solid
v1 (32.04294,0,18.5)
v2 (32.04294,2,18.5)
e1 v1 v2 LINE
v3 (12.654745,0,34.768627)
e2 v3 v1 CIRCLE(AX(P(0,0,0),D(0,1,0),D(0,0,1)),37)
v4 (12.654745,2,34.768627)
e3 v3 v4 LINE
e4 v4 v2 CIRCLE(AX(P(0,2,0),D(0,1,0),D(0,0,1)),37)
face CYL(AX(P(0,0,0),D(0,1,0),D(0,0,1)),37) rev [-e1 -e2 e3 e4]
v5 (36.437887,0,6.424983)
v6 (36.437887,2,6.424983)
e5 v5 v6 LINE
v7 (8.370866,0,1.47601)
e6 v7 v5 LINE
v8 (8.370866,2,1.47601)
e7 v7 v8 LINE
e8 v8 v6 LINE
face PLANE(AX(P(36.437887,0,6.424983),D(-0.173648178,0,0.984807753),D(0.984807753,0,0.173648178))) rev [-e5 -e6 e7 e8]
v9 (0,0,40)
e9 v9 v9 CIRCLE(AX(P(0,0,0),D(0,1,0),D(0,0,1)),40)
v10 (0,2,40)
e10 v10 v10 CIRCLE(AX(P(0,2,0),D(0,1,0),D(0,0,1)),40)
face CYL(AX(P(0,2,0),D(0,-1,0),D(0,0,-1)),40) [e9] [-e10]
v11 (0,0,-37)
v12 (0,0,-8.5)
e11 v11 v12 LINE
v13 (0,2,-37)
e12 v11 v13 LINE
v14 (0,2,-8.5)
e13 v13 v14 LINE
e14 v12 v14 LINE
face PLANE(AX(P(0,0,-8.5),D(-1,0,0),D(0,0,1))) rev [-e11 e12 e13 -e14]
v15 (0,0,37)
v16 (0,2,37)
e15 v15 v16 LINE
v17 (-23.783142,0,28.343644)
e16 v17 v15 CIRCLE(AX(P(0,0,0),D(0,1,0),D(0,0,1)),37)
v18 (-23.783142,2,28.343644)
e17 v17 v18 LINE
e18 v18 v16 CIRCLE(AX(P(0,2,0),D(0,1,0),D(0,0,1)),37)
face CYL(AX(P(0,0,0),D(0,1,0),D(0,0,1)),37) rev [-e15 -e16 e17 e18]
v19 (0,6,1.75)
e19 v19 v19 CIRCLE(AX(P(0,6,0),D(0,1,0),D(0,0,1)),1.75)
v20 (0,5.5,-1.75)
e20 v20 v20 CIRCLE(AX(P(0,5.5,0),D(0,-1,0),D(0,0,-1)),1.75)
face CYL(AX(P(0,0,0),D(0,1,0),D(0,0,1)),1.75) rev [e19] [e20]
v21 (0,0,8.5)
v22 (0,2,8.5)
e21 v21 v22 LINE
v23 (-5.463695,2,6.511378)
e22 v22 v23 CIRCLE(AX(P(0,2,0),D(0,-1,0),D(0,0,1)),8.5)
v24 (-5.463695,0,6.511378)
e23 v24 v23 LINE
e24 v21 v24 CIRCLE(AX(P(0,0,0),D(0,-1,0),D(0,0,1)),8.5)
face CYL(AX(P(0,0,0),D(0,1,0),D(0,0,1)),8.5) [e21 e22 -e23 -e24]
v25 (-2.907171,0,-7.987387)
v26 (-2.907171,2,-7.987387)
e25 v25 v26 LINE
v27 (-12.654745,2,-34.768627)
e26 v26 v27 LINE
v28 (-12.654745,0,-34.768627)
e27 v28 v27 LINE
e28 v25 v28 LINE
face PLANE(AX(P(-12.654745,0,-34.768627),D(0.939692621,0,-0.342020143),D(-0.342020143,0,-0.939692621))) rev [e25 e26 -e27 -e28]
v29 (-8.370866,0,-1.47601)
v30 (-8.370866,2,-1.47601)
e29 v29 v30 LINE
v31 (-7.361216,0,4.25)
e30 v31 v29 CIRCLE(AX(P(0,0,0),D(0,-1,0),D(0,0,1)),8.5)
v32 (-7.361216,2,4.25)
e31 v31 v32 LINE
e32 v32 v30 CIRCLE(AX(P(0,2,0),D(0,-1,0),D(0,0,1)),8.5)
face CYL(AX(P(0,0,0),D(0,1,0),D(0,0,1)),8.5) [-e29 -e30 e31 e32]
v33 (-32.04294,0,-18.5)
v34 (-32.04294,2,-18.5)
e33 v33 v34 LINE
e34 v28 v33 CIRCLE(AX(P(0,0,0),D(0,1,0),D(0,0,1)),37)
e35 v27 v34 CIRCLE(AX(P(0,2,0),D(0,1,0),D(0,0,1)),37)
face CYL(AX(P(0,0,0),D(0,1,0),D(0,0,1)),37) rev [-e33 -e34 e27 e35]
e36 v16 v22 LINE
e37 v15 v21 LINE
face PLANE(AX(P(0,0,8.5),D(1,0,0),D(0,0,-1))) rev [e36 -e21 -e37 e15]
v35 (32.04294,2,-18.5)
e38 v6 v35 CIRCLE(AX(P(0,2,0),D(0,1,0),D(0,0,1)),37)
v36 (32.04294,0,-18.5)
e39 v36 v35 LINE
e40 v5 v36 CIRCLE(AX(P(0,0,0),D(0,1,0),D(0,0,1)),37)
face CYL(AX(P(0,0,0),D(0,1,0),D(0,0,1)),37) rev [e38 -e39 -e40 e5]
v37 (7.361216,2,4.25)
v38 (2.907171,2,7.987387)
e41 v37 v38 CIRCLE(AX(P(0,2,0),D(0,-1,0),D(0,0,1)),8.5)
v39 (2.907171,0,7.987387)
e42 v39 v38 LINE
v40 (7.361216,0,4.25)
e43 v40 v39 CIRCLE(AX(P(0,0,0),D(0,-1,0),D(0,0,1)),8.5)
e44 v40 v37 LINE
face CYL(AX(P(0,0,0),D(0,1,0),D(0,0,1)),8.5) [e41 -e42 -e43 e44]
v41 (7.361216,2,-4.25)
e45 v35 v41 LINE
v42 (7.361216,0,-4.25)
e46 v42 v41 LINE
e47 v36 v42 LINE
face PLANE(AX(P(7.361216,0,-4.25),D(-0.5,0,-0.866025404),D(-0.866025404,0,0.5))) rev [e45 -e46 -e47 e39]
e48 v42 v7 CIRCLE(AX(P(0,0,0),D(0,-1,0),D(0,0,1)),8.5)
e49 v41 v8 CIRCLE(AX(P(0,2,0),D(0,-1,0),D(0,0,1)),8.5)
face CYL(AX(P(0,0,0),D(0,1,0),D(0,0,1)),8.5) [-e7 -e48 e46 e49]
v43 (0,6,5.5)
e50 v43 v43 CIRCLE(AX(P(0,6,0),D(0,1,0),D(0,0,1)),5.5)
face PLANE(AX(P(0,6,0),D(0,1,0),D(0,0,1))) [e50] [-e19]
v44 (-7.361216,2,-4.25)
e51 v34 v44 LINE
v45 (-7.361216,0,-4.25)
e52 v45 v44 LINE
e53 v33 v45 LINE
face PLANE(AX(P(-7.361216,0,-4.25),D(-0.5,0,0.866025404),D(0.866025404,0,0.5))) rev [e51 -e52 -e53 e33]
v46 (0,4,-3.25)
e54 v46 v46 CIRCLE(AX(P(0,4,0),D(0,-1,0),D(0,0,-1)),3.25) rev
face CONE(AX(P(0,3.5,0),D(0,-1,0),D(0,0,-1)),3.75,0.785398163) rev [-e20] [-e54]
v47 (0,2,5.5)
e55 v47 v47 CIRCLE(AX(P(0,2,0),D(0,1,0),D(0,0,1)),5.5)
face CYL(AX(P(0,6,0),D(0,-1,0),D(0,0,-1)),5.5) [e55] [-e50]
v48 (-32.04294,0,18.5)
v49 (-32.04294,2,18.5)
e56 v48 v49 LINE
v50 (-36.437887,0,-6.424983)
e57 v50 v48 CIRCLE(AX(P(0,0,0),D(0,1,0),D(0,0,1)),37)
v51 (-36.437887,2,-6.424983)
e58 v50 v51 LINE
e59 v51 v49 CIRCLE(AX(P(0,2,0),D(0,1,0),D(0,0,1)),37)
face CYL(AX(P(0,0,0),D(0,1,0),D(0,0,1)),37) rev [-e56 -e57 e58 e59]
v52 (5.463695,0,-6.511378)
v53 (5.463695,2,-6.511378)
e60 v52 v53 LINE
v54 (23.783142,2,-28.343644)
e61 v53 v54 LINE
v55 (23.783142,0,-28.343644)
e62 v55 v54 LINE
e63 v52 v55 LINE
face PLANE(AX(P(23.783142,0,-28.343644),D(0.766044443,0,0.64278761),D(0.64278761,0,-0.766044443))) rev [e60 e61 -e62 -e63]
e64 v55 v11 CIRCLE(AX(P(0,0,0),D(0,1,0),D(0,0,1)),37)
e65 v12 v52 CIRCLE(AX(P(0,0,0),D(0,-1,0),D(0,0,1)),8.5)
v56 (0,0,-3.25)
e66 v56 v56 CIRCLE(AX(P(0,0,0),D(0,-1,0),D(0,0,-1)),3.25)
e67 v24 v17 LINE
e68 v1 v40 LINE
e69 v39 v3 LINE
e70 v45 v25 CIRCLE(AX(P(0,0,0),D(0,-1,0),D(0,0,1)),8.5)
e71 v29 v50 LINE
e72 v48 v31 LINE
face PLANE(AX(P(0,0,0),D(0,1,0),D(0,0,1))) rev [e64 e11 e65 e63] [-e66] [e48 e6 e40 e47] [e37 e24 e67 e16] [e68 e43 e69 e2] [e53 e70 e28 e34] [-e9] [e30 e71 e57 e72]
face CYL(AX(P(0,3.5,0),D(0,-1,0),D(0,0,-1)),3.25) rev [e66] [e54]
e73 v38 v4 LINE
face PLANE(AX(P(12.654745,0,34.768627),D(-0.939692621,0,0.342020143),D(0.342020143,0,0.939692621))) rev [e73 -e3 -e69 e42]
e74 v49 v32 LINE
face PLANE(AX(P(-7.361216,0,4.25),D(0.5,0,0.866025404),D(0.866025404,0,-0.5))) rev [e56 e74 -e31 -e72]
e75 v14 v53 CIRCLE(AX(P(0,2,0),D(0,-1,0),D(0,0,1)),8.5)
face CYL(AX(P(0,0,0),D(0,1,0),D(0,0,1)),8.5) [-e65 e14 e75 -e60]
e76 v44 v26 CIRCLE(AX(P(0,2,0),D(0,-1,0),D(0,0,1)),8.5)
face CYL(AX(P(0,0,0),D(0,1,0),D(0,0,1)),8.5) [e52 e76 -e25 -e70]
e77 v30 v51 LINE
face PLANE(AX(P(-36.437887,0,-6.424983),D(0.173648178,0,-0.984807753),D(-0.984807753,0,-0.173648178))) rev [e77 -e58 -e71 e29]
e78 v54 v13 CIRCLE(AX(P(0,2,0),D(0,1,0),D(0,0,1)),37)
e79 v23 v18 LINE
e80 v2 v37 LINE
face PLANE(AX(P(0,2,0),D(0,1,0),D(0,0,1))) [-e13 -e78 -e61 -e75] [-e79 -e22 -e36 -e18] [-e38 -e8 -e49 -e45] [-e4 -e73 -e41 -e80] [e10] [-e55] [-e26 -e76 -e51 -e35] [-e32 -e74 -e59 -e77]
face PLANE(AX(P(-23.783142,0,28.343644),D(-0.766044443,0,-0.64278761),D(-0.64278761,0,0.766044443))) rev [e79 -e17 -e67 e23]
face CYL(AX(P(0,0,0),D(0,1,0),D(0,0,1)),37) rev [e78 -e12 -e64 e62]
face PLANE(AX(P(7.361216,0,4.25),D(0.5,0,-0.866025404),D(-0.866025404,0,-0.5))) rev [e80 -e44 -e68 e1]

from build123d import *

# Parameters (mm, degrees)
CROQUIS1_R              = 40
SALIENTE_EXTRUIR1_DEPTH = 2
CROQUIS2_R              = 5.5
SALIENTE_EXTRUIR2_DEPTH = 4
CROQUIS3_R              = 1.75
CORTAR_EXTRUIR1_DEPTH   = 57.885850613
CROQUIS4_R              = 3.25
CORTAR_EXTRUIR2_DEPTH   = 3.5
CHAFL_N1_SIZE           = 2
CORTAR_EXTRUIR3_DEPTH   = 57.709787515


with BuildPart() as part:
    # Croquis1 → Saliente-Extruir1 (new body)
    with BuildSketch(Plane(origin=(0, 0, 0), x_dir=(1, 0, 0), z_dir=(0, 1, 0))):
        with Locations(Location((0, 0, 0), (0, 0, 270))):
            Circle(CROQUIS1_R)
    extrude(amount=SALIENTE_EXTRUIR1_DEPTH)

    # Croquis2 → Saliente-Extruir2 (add)
    with BuildSketch(Plane(origin=(0, 2, 0), x_dir=(1, 0, 0), z_dir=(0, 1, 0))):
        with Locations(Location((0, 0, 0), (0, 0, 270))):
            Circle(CROQUIS2_R)
    extrude(amount=SALIENTE_EXTRUIR2_DEPTH)

    # Croquis3 → Cortar-Extruir1 (cut, through all)
    with BuildSketch(Plane(origin=(0, 6, 0), x_dir=(1, 0, 0), z_dir=(0, 1, 0))):
        with Locations(Location((0, 0, 0), (0, 0, 270))):
            Circle(CROQUIS3_R)
    extrude(amount=-CORTAR_EXTRUIR1_DEPTH, mode=Mode.SUBTRACT)

    # Croquis4 → Cortar-Extruir2 (cut)
    with BuildSketch(Plane(origin=(0, 0, 0), x_dir=(-1, 0, 0), z_dir=(0, -1, 0))):
        with Locations(Location((0, 0, 0), (0, 0, 90))):
            Circle(CROQUIS4_R)
    extrude(amount=-CORTAR_EXTRUIR2_DEPTH, mode=Mode.SUBTRACT)

    # Chaflán1
    # the kernel refuses this chamfer: 2 mm, written as the material it takes off along each edge
    with BuildSketch(Plane(origin=(0, 3.5, 0), x_dir=(0, 0, 1), z_dir=(-1, 0, 0))) as chafl_n1_piece_1_section:
        Polygon((1.75 + CHAFL_N1_SIZE, 0), (1.75, CHAFL_N1_SIZE), (1.75, 0), align=None)
    chafl_n1_piece_1 = revolve(axis=Axis((0, 3.5, 0), (0, 1, 0)), mode=Mode.PRIVATE)
    chafl_n1_piece_1 = chafl_n1_piece_1 & Plane(origin=(0, 4.756379489, 0), x_dir=(0, 0, -1), z_dir=(0, -1, 0)) * Cylinder(3.25, 15, mode=Mode.PRIVATE)
    add(chafl_n1_piece_1, mode=Mode.SUBTRACT)

    # Croquis5 → Cortar-Extruir3 (cut, through all)
    with BuildSketch(Plane(origin=(0, 2, 0), x_dir=(1, 0, 0), z_dir=(0, 1, 0))):
        with BuildLine():
            Line((0, 8.5), (0, 37))
            ThreePointArc((0, 37), (12.654745303, 34.768626969), (23.783141558, 28.343644395))
            Line((23.783141558, 28.343644395), (5.463694682, 6.511377767))
            ThreePointArc((5.463694682, 6.511377767), (2.907171218, 7.987387277), (0, 8.5))
        make_face()
        with BuildLine():
            Line((7.361215932, 4.25), (32.04293994, 18.5))
            ThreePointArc((32.04293994, 18.5), (36.437886861, 6.424982574), (36.437886861, -6.424982574))
            Line((36.437886861, -6.424982574), (8.370865901, -1.47600951))
            ThreePointArc((8.370865901, -1.47600951), (8.370865901, 1.47600951), (7.361215932, 4.25))
        make_face()
        with BuildLine():
            Line((7.361215932, -4.25), (32.04293994, -18.5))
            ThreePointArc((32.04293994, -18.5), (23.783141558, -28.343644395), (12.654745303, -34.768626969))
            Line((12.654745303, -34.768626969), (2.907171218, -7.987387277))
            ThreePointArc((2.907171218, -7.987387277), (5.463694682, -6.511377767), (7.361215932, -4.25))
        make_face()
        with BuildLine():
            Line((0, -8.5), (0, -37))
            ThreePointArc((0, -37), (-12.654745303, -34.768626969), (-23.783141558, -28.343644395))
            Line((-23.783141558, -28.343644395), (-5.463694682, -6.511377767))
            ThreePointArc((-5.463694682, -6.511377767), (-2.907171218, -7.987387277), (0, -8.5))
        make_face()
        with BuildLine():
            Line((-7.361215932, -4.25), (-32.04293994, -18.5))
            ThreePointArc((-32.04293994, -18.5), (-36.437886861, -6.424982574), (-36.437886861, 6.424982574))
            Line((-36.437886861, 6.424982574), (-8.370865901, 1.47600951))
            ThreePointArc((-8.370865901, 1.47600951), (-8.370865901, -1.47600951), (-7.361215932, -4.25))
        make_face()
        with BuildLine():
            Line((-7.361215932, 4.25), (-32.04293994, 18.5))
            ThreePointArc((-32.04293994, 18.5), (-23.783141558, 28.343644395), (-12.654745303, 34.768626969))
            Line((-12.654745303, 34.768626969), (-2.907171218, 7.987387277))
            ThreePointArc((-2.907171218, 7.987387277), (-5.463694682, 6.511377767), (-7.361215932, 4.25))
        make_face()
    extrude(amount=-CORTAR_EXTRUIR3_DEPTH, mode=Mode.SUBTRACT)


solid = part.part
